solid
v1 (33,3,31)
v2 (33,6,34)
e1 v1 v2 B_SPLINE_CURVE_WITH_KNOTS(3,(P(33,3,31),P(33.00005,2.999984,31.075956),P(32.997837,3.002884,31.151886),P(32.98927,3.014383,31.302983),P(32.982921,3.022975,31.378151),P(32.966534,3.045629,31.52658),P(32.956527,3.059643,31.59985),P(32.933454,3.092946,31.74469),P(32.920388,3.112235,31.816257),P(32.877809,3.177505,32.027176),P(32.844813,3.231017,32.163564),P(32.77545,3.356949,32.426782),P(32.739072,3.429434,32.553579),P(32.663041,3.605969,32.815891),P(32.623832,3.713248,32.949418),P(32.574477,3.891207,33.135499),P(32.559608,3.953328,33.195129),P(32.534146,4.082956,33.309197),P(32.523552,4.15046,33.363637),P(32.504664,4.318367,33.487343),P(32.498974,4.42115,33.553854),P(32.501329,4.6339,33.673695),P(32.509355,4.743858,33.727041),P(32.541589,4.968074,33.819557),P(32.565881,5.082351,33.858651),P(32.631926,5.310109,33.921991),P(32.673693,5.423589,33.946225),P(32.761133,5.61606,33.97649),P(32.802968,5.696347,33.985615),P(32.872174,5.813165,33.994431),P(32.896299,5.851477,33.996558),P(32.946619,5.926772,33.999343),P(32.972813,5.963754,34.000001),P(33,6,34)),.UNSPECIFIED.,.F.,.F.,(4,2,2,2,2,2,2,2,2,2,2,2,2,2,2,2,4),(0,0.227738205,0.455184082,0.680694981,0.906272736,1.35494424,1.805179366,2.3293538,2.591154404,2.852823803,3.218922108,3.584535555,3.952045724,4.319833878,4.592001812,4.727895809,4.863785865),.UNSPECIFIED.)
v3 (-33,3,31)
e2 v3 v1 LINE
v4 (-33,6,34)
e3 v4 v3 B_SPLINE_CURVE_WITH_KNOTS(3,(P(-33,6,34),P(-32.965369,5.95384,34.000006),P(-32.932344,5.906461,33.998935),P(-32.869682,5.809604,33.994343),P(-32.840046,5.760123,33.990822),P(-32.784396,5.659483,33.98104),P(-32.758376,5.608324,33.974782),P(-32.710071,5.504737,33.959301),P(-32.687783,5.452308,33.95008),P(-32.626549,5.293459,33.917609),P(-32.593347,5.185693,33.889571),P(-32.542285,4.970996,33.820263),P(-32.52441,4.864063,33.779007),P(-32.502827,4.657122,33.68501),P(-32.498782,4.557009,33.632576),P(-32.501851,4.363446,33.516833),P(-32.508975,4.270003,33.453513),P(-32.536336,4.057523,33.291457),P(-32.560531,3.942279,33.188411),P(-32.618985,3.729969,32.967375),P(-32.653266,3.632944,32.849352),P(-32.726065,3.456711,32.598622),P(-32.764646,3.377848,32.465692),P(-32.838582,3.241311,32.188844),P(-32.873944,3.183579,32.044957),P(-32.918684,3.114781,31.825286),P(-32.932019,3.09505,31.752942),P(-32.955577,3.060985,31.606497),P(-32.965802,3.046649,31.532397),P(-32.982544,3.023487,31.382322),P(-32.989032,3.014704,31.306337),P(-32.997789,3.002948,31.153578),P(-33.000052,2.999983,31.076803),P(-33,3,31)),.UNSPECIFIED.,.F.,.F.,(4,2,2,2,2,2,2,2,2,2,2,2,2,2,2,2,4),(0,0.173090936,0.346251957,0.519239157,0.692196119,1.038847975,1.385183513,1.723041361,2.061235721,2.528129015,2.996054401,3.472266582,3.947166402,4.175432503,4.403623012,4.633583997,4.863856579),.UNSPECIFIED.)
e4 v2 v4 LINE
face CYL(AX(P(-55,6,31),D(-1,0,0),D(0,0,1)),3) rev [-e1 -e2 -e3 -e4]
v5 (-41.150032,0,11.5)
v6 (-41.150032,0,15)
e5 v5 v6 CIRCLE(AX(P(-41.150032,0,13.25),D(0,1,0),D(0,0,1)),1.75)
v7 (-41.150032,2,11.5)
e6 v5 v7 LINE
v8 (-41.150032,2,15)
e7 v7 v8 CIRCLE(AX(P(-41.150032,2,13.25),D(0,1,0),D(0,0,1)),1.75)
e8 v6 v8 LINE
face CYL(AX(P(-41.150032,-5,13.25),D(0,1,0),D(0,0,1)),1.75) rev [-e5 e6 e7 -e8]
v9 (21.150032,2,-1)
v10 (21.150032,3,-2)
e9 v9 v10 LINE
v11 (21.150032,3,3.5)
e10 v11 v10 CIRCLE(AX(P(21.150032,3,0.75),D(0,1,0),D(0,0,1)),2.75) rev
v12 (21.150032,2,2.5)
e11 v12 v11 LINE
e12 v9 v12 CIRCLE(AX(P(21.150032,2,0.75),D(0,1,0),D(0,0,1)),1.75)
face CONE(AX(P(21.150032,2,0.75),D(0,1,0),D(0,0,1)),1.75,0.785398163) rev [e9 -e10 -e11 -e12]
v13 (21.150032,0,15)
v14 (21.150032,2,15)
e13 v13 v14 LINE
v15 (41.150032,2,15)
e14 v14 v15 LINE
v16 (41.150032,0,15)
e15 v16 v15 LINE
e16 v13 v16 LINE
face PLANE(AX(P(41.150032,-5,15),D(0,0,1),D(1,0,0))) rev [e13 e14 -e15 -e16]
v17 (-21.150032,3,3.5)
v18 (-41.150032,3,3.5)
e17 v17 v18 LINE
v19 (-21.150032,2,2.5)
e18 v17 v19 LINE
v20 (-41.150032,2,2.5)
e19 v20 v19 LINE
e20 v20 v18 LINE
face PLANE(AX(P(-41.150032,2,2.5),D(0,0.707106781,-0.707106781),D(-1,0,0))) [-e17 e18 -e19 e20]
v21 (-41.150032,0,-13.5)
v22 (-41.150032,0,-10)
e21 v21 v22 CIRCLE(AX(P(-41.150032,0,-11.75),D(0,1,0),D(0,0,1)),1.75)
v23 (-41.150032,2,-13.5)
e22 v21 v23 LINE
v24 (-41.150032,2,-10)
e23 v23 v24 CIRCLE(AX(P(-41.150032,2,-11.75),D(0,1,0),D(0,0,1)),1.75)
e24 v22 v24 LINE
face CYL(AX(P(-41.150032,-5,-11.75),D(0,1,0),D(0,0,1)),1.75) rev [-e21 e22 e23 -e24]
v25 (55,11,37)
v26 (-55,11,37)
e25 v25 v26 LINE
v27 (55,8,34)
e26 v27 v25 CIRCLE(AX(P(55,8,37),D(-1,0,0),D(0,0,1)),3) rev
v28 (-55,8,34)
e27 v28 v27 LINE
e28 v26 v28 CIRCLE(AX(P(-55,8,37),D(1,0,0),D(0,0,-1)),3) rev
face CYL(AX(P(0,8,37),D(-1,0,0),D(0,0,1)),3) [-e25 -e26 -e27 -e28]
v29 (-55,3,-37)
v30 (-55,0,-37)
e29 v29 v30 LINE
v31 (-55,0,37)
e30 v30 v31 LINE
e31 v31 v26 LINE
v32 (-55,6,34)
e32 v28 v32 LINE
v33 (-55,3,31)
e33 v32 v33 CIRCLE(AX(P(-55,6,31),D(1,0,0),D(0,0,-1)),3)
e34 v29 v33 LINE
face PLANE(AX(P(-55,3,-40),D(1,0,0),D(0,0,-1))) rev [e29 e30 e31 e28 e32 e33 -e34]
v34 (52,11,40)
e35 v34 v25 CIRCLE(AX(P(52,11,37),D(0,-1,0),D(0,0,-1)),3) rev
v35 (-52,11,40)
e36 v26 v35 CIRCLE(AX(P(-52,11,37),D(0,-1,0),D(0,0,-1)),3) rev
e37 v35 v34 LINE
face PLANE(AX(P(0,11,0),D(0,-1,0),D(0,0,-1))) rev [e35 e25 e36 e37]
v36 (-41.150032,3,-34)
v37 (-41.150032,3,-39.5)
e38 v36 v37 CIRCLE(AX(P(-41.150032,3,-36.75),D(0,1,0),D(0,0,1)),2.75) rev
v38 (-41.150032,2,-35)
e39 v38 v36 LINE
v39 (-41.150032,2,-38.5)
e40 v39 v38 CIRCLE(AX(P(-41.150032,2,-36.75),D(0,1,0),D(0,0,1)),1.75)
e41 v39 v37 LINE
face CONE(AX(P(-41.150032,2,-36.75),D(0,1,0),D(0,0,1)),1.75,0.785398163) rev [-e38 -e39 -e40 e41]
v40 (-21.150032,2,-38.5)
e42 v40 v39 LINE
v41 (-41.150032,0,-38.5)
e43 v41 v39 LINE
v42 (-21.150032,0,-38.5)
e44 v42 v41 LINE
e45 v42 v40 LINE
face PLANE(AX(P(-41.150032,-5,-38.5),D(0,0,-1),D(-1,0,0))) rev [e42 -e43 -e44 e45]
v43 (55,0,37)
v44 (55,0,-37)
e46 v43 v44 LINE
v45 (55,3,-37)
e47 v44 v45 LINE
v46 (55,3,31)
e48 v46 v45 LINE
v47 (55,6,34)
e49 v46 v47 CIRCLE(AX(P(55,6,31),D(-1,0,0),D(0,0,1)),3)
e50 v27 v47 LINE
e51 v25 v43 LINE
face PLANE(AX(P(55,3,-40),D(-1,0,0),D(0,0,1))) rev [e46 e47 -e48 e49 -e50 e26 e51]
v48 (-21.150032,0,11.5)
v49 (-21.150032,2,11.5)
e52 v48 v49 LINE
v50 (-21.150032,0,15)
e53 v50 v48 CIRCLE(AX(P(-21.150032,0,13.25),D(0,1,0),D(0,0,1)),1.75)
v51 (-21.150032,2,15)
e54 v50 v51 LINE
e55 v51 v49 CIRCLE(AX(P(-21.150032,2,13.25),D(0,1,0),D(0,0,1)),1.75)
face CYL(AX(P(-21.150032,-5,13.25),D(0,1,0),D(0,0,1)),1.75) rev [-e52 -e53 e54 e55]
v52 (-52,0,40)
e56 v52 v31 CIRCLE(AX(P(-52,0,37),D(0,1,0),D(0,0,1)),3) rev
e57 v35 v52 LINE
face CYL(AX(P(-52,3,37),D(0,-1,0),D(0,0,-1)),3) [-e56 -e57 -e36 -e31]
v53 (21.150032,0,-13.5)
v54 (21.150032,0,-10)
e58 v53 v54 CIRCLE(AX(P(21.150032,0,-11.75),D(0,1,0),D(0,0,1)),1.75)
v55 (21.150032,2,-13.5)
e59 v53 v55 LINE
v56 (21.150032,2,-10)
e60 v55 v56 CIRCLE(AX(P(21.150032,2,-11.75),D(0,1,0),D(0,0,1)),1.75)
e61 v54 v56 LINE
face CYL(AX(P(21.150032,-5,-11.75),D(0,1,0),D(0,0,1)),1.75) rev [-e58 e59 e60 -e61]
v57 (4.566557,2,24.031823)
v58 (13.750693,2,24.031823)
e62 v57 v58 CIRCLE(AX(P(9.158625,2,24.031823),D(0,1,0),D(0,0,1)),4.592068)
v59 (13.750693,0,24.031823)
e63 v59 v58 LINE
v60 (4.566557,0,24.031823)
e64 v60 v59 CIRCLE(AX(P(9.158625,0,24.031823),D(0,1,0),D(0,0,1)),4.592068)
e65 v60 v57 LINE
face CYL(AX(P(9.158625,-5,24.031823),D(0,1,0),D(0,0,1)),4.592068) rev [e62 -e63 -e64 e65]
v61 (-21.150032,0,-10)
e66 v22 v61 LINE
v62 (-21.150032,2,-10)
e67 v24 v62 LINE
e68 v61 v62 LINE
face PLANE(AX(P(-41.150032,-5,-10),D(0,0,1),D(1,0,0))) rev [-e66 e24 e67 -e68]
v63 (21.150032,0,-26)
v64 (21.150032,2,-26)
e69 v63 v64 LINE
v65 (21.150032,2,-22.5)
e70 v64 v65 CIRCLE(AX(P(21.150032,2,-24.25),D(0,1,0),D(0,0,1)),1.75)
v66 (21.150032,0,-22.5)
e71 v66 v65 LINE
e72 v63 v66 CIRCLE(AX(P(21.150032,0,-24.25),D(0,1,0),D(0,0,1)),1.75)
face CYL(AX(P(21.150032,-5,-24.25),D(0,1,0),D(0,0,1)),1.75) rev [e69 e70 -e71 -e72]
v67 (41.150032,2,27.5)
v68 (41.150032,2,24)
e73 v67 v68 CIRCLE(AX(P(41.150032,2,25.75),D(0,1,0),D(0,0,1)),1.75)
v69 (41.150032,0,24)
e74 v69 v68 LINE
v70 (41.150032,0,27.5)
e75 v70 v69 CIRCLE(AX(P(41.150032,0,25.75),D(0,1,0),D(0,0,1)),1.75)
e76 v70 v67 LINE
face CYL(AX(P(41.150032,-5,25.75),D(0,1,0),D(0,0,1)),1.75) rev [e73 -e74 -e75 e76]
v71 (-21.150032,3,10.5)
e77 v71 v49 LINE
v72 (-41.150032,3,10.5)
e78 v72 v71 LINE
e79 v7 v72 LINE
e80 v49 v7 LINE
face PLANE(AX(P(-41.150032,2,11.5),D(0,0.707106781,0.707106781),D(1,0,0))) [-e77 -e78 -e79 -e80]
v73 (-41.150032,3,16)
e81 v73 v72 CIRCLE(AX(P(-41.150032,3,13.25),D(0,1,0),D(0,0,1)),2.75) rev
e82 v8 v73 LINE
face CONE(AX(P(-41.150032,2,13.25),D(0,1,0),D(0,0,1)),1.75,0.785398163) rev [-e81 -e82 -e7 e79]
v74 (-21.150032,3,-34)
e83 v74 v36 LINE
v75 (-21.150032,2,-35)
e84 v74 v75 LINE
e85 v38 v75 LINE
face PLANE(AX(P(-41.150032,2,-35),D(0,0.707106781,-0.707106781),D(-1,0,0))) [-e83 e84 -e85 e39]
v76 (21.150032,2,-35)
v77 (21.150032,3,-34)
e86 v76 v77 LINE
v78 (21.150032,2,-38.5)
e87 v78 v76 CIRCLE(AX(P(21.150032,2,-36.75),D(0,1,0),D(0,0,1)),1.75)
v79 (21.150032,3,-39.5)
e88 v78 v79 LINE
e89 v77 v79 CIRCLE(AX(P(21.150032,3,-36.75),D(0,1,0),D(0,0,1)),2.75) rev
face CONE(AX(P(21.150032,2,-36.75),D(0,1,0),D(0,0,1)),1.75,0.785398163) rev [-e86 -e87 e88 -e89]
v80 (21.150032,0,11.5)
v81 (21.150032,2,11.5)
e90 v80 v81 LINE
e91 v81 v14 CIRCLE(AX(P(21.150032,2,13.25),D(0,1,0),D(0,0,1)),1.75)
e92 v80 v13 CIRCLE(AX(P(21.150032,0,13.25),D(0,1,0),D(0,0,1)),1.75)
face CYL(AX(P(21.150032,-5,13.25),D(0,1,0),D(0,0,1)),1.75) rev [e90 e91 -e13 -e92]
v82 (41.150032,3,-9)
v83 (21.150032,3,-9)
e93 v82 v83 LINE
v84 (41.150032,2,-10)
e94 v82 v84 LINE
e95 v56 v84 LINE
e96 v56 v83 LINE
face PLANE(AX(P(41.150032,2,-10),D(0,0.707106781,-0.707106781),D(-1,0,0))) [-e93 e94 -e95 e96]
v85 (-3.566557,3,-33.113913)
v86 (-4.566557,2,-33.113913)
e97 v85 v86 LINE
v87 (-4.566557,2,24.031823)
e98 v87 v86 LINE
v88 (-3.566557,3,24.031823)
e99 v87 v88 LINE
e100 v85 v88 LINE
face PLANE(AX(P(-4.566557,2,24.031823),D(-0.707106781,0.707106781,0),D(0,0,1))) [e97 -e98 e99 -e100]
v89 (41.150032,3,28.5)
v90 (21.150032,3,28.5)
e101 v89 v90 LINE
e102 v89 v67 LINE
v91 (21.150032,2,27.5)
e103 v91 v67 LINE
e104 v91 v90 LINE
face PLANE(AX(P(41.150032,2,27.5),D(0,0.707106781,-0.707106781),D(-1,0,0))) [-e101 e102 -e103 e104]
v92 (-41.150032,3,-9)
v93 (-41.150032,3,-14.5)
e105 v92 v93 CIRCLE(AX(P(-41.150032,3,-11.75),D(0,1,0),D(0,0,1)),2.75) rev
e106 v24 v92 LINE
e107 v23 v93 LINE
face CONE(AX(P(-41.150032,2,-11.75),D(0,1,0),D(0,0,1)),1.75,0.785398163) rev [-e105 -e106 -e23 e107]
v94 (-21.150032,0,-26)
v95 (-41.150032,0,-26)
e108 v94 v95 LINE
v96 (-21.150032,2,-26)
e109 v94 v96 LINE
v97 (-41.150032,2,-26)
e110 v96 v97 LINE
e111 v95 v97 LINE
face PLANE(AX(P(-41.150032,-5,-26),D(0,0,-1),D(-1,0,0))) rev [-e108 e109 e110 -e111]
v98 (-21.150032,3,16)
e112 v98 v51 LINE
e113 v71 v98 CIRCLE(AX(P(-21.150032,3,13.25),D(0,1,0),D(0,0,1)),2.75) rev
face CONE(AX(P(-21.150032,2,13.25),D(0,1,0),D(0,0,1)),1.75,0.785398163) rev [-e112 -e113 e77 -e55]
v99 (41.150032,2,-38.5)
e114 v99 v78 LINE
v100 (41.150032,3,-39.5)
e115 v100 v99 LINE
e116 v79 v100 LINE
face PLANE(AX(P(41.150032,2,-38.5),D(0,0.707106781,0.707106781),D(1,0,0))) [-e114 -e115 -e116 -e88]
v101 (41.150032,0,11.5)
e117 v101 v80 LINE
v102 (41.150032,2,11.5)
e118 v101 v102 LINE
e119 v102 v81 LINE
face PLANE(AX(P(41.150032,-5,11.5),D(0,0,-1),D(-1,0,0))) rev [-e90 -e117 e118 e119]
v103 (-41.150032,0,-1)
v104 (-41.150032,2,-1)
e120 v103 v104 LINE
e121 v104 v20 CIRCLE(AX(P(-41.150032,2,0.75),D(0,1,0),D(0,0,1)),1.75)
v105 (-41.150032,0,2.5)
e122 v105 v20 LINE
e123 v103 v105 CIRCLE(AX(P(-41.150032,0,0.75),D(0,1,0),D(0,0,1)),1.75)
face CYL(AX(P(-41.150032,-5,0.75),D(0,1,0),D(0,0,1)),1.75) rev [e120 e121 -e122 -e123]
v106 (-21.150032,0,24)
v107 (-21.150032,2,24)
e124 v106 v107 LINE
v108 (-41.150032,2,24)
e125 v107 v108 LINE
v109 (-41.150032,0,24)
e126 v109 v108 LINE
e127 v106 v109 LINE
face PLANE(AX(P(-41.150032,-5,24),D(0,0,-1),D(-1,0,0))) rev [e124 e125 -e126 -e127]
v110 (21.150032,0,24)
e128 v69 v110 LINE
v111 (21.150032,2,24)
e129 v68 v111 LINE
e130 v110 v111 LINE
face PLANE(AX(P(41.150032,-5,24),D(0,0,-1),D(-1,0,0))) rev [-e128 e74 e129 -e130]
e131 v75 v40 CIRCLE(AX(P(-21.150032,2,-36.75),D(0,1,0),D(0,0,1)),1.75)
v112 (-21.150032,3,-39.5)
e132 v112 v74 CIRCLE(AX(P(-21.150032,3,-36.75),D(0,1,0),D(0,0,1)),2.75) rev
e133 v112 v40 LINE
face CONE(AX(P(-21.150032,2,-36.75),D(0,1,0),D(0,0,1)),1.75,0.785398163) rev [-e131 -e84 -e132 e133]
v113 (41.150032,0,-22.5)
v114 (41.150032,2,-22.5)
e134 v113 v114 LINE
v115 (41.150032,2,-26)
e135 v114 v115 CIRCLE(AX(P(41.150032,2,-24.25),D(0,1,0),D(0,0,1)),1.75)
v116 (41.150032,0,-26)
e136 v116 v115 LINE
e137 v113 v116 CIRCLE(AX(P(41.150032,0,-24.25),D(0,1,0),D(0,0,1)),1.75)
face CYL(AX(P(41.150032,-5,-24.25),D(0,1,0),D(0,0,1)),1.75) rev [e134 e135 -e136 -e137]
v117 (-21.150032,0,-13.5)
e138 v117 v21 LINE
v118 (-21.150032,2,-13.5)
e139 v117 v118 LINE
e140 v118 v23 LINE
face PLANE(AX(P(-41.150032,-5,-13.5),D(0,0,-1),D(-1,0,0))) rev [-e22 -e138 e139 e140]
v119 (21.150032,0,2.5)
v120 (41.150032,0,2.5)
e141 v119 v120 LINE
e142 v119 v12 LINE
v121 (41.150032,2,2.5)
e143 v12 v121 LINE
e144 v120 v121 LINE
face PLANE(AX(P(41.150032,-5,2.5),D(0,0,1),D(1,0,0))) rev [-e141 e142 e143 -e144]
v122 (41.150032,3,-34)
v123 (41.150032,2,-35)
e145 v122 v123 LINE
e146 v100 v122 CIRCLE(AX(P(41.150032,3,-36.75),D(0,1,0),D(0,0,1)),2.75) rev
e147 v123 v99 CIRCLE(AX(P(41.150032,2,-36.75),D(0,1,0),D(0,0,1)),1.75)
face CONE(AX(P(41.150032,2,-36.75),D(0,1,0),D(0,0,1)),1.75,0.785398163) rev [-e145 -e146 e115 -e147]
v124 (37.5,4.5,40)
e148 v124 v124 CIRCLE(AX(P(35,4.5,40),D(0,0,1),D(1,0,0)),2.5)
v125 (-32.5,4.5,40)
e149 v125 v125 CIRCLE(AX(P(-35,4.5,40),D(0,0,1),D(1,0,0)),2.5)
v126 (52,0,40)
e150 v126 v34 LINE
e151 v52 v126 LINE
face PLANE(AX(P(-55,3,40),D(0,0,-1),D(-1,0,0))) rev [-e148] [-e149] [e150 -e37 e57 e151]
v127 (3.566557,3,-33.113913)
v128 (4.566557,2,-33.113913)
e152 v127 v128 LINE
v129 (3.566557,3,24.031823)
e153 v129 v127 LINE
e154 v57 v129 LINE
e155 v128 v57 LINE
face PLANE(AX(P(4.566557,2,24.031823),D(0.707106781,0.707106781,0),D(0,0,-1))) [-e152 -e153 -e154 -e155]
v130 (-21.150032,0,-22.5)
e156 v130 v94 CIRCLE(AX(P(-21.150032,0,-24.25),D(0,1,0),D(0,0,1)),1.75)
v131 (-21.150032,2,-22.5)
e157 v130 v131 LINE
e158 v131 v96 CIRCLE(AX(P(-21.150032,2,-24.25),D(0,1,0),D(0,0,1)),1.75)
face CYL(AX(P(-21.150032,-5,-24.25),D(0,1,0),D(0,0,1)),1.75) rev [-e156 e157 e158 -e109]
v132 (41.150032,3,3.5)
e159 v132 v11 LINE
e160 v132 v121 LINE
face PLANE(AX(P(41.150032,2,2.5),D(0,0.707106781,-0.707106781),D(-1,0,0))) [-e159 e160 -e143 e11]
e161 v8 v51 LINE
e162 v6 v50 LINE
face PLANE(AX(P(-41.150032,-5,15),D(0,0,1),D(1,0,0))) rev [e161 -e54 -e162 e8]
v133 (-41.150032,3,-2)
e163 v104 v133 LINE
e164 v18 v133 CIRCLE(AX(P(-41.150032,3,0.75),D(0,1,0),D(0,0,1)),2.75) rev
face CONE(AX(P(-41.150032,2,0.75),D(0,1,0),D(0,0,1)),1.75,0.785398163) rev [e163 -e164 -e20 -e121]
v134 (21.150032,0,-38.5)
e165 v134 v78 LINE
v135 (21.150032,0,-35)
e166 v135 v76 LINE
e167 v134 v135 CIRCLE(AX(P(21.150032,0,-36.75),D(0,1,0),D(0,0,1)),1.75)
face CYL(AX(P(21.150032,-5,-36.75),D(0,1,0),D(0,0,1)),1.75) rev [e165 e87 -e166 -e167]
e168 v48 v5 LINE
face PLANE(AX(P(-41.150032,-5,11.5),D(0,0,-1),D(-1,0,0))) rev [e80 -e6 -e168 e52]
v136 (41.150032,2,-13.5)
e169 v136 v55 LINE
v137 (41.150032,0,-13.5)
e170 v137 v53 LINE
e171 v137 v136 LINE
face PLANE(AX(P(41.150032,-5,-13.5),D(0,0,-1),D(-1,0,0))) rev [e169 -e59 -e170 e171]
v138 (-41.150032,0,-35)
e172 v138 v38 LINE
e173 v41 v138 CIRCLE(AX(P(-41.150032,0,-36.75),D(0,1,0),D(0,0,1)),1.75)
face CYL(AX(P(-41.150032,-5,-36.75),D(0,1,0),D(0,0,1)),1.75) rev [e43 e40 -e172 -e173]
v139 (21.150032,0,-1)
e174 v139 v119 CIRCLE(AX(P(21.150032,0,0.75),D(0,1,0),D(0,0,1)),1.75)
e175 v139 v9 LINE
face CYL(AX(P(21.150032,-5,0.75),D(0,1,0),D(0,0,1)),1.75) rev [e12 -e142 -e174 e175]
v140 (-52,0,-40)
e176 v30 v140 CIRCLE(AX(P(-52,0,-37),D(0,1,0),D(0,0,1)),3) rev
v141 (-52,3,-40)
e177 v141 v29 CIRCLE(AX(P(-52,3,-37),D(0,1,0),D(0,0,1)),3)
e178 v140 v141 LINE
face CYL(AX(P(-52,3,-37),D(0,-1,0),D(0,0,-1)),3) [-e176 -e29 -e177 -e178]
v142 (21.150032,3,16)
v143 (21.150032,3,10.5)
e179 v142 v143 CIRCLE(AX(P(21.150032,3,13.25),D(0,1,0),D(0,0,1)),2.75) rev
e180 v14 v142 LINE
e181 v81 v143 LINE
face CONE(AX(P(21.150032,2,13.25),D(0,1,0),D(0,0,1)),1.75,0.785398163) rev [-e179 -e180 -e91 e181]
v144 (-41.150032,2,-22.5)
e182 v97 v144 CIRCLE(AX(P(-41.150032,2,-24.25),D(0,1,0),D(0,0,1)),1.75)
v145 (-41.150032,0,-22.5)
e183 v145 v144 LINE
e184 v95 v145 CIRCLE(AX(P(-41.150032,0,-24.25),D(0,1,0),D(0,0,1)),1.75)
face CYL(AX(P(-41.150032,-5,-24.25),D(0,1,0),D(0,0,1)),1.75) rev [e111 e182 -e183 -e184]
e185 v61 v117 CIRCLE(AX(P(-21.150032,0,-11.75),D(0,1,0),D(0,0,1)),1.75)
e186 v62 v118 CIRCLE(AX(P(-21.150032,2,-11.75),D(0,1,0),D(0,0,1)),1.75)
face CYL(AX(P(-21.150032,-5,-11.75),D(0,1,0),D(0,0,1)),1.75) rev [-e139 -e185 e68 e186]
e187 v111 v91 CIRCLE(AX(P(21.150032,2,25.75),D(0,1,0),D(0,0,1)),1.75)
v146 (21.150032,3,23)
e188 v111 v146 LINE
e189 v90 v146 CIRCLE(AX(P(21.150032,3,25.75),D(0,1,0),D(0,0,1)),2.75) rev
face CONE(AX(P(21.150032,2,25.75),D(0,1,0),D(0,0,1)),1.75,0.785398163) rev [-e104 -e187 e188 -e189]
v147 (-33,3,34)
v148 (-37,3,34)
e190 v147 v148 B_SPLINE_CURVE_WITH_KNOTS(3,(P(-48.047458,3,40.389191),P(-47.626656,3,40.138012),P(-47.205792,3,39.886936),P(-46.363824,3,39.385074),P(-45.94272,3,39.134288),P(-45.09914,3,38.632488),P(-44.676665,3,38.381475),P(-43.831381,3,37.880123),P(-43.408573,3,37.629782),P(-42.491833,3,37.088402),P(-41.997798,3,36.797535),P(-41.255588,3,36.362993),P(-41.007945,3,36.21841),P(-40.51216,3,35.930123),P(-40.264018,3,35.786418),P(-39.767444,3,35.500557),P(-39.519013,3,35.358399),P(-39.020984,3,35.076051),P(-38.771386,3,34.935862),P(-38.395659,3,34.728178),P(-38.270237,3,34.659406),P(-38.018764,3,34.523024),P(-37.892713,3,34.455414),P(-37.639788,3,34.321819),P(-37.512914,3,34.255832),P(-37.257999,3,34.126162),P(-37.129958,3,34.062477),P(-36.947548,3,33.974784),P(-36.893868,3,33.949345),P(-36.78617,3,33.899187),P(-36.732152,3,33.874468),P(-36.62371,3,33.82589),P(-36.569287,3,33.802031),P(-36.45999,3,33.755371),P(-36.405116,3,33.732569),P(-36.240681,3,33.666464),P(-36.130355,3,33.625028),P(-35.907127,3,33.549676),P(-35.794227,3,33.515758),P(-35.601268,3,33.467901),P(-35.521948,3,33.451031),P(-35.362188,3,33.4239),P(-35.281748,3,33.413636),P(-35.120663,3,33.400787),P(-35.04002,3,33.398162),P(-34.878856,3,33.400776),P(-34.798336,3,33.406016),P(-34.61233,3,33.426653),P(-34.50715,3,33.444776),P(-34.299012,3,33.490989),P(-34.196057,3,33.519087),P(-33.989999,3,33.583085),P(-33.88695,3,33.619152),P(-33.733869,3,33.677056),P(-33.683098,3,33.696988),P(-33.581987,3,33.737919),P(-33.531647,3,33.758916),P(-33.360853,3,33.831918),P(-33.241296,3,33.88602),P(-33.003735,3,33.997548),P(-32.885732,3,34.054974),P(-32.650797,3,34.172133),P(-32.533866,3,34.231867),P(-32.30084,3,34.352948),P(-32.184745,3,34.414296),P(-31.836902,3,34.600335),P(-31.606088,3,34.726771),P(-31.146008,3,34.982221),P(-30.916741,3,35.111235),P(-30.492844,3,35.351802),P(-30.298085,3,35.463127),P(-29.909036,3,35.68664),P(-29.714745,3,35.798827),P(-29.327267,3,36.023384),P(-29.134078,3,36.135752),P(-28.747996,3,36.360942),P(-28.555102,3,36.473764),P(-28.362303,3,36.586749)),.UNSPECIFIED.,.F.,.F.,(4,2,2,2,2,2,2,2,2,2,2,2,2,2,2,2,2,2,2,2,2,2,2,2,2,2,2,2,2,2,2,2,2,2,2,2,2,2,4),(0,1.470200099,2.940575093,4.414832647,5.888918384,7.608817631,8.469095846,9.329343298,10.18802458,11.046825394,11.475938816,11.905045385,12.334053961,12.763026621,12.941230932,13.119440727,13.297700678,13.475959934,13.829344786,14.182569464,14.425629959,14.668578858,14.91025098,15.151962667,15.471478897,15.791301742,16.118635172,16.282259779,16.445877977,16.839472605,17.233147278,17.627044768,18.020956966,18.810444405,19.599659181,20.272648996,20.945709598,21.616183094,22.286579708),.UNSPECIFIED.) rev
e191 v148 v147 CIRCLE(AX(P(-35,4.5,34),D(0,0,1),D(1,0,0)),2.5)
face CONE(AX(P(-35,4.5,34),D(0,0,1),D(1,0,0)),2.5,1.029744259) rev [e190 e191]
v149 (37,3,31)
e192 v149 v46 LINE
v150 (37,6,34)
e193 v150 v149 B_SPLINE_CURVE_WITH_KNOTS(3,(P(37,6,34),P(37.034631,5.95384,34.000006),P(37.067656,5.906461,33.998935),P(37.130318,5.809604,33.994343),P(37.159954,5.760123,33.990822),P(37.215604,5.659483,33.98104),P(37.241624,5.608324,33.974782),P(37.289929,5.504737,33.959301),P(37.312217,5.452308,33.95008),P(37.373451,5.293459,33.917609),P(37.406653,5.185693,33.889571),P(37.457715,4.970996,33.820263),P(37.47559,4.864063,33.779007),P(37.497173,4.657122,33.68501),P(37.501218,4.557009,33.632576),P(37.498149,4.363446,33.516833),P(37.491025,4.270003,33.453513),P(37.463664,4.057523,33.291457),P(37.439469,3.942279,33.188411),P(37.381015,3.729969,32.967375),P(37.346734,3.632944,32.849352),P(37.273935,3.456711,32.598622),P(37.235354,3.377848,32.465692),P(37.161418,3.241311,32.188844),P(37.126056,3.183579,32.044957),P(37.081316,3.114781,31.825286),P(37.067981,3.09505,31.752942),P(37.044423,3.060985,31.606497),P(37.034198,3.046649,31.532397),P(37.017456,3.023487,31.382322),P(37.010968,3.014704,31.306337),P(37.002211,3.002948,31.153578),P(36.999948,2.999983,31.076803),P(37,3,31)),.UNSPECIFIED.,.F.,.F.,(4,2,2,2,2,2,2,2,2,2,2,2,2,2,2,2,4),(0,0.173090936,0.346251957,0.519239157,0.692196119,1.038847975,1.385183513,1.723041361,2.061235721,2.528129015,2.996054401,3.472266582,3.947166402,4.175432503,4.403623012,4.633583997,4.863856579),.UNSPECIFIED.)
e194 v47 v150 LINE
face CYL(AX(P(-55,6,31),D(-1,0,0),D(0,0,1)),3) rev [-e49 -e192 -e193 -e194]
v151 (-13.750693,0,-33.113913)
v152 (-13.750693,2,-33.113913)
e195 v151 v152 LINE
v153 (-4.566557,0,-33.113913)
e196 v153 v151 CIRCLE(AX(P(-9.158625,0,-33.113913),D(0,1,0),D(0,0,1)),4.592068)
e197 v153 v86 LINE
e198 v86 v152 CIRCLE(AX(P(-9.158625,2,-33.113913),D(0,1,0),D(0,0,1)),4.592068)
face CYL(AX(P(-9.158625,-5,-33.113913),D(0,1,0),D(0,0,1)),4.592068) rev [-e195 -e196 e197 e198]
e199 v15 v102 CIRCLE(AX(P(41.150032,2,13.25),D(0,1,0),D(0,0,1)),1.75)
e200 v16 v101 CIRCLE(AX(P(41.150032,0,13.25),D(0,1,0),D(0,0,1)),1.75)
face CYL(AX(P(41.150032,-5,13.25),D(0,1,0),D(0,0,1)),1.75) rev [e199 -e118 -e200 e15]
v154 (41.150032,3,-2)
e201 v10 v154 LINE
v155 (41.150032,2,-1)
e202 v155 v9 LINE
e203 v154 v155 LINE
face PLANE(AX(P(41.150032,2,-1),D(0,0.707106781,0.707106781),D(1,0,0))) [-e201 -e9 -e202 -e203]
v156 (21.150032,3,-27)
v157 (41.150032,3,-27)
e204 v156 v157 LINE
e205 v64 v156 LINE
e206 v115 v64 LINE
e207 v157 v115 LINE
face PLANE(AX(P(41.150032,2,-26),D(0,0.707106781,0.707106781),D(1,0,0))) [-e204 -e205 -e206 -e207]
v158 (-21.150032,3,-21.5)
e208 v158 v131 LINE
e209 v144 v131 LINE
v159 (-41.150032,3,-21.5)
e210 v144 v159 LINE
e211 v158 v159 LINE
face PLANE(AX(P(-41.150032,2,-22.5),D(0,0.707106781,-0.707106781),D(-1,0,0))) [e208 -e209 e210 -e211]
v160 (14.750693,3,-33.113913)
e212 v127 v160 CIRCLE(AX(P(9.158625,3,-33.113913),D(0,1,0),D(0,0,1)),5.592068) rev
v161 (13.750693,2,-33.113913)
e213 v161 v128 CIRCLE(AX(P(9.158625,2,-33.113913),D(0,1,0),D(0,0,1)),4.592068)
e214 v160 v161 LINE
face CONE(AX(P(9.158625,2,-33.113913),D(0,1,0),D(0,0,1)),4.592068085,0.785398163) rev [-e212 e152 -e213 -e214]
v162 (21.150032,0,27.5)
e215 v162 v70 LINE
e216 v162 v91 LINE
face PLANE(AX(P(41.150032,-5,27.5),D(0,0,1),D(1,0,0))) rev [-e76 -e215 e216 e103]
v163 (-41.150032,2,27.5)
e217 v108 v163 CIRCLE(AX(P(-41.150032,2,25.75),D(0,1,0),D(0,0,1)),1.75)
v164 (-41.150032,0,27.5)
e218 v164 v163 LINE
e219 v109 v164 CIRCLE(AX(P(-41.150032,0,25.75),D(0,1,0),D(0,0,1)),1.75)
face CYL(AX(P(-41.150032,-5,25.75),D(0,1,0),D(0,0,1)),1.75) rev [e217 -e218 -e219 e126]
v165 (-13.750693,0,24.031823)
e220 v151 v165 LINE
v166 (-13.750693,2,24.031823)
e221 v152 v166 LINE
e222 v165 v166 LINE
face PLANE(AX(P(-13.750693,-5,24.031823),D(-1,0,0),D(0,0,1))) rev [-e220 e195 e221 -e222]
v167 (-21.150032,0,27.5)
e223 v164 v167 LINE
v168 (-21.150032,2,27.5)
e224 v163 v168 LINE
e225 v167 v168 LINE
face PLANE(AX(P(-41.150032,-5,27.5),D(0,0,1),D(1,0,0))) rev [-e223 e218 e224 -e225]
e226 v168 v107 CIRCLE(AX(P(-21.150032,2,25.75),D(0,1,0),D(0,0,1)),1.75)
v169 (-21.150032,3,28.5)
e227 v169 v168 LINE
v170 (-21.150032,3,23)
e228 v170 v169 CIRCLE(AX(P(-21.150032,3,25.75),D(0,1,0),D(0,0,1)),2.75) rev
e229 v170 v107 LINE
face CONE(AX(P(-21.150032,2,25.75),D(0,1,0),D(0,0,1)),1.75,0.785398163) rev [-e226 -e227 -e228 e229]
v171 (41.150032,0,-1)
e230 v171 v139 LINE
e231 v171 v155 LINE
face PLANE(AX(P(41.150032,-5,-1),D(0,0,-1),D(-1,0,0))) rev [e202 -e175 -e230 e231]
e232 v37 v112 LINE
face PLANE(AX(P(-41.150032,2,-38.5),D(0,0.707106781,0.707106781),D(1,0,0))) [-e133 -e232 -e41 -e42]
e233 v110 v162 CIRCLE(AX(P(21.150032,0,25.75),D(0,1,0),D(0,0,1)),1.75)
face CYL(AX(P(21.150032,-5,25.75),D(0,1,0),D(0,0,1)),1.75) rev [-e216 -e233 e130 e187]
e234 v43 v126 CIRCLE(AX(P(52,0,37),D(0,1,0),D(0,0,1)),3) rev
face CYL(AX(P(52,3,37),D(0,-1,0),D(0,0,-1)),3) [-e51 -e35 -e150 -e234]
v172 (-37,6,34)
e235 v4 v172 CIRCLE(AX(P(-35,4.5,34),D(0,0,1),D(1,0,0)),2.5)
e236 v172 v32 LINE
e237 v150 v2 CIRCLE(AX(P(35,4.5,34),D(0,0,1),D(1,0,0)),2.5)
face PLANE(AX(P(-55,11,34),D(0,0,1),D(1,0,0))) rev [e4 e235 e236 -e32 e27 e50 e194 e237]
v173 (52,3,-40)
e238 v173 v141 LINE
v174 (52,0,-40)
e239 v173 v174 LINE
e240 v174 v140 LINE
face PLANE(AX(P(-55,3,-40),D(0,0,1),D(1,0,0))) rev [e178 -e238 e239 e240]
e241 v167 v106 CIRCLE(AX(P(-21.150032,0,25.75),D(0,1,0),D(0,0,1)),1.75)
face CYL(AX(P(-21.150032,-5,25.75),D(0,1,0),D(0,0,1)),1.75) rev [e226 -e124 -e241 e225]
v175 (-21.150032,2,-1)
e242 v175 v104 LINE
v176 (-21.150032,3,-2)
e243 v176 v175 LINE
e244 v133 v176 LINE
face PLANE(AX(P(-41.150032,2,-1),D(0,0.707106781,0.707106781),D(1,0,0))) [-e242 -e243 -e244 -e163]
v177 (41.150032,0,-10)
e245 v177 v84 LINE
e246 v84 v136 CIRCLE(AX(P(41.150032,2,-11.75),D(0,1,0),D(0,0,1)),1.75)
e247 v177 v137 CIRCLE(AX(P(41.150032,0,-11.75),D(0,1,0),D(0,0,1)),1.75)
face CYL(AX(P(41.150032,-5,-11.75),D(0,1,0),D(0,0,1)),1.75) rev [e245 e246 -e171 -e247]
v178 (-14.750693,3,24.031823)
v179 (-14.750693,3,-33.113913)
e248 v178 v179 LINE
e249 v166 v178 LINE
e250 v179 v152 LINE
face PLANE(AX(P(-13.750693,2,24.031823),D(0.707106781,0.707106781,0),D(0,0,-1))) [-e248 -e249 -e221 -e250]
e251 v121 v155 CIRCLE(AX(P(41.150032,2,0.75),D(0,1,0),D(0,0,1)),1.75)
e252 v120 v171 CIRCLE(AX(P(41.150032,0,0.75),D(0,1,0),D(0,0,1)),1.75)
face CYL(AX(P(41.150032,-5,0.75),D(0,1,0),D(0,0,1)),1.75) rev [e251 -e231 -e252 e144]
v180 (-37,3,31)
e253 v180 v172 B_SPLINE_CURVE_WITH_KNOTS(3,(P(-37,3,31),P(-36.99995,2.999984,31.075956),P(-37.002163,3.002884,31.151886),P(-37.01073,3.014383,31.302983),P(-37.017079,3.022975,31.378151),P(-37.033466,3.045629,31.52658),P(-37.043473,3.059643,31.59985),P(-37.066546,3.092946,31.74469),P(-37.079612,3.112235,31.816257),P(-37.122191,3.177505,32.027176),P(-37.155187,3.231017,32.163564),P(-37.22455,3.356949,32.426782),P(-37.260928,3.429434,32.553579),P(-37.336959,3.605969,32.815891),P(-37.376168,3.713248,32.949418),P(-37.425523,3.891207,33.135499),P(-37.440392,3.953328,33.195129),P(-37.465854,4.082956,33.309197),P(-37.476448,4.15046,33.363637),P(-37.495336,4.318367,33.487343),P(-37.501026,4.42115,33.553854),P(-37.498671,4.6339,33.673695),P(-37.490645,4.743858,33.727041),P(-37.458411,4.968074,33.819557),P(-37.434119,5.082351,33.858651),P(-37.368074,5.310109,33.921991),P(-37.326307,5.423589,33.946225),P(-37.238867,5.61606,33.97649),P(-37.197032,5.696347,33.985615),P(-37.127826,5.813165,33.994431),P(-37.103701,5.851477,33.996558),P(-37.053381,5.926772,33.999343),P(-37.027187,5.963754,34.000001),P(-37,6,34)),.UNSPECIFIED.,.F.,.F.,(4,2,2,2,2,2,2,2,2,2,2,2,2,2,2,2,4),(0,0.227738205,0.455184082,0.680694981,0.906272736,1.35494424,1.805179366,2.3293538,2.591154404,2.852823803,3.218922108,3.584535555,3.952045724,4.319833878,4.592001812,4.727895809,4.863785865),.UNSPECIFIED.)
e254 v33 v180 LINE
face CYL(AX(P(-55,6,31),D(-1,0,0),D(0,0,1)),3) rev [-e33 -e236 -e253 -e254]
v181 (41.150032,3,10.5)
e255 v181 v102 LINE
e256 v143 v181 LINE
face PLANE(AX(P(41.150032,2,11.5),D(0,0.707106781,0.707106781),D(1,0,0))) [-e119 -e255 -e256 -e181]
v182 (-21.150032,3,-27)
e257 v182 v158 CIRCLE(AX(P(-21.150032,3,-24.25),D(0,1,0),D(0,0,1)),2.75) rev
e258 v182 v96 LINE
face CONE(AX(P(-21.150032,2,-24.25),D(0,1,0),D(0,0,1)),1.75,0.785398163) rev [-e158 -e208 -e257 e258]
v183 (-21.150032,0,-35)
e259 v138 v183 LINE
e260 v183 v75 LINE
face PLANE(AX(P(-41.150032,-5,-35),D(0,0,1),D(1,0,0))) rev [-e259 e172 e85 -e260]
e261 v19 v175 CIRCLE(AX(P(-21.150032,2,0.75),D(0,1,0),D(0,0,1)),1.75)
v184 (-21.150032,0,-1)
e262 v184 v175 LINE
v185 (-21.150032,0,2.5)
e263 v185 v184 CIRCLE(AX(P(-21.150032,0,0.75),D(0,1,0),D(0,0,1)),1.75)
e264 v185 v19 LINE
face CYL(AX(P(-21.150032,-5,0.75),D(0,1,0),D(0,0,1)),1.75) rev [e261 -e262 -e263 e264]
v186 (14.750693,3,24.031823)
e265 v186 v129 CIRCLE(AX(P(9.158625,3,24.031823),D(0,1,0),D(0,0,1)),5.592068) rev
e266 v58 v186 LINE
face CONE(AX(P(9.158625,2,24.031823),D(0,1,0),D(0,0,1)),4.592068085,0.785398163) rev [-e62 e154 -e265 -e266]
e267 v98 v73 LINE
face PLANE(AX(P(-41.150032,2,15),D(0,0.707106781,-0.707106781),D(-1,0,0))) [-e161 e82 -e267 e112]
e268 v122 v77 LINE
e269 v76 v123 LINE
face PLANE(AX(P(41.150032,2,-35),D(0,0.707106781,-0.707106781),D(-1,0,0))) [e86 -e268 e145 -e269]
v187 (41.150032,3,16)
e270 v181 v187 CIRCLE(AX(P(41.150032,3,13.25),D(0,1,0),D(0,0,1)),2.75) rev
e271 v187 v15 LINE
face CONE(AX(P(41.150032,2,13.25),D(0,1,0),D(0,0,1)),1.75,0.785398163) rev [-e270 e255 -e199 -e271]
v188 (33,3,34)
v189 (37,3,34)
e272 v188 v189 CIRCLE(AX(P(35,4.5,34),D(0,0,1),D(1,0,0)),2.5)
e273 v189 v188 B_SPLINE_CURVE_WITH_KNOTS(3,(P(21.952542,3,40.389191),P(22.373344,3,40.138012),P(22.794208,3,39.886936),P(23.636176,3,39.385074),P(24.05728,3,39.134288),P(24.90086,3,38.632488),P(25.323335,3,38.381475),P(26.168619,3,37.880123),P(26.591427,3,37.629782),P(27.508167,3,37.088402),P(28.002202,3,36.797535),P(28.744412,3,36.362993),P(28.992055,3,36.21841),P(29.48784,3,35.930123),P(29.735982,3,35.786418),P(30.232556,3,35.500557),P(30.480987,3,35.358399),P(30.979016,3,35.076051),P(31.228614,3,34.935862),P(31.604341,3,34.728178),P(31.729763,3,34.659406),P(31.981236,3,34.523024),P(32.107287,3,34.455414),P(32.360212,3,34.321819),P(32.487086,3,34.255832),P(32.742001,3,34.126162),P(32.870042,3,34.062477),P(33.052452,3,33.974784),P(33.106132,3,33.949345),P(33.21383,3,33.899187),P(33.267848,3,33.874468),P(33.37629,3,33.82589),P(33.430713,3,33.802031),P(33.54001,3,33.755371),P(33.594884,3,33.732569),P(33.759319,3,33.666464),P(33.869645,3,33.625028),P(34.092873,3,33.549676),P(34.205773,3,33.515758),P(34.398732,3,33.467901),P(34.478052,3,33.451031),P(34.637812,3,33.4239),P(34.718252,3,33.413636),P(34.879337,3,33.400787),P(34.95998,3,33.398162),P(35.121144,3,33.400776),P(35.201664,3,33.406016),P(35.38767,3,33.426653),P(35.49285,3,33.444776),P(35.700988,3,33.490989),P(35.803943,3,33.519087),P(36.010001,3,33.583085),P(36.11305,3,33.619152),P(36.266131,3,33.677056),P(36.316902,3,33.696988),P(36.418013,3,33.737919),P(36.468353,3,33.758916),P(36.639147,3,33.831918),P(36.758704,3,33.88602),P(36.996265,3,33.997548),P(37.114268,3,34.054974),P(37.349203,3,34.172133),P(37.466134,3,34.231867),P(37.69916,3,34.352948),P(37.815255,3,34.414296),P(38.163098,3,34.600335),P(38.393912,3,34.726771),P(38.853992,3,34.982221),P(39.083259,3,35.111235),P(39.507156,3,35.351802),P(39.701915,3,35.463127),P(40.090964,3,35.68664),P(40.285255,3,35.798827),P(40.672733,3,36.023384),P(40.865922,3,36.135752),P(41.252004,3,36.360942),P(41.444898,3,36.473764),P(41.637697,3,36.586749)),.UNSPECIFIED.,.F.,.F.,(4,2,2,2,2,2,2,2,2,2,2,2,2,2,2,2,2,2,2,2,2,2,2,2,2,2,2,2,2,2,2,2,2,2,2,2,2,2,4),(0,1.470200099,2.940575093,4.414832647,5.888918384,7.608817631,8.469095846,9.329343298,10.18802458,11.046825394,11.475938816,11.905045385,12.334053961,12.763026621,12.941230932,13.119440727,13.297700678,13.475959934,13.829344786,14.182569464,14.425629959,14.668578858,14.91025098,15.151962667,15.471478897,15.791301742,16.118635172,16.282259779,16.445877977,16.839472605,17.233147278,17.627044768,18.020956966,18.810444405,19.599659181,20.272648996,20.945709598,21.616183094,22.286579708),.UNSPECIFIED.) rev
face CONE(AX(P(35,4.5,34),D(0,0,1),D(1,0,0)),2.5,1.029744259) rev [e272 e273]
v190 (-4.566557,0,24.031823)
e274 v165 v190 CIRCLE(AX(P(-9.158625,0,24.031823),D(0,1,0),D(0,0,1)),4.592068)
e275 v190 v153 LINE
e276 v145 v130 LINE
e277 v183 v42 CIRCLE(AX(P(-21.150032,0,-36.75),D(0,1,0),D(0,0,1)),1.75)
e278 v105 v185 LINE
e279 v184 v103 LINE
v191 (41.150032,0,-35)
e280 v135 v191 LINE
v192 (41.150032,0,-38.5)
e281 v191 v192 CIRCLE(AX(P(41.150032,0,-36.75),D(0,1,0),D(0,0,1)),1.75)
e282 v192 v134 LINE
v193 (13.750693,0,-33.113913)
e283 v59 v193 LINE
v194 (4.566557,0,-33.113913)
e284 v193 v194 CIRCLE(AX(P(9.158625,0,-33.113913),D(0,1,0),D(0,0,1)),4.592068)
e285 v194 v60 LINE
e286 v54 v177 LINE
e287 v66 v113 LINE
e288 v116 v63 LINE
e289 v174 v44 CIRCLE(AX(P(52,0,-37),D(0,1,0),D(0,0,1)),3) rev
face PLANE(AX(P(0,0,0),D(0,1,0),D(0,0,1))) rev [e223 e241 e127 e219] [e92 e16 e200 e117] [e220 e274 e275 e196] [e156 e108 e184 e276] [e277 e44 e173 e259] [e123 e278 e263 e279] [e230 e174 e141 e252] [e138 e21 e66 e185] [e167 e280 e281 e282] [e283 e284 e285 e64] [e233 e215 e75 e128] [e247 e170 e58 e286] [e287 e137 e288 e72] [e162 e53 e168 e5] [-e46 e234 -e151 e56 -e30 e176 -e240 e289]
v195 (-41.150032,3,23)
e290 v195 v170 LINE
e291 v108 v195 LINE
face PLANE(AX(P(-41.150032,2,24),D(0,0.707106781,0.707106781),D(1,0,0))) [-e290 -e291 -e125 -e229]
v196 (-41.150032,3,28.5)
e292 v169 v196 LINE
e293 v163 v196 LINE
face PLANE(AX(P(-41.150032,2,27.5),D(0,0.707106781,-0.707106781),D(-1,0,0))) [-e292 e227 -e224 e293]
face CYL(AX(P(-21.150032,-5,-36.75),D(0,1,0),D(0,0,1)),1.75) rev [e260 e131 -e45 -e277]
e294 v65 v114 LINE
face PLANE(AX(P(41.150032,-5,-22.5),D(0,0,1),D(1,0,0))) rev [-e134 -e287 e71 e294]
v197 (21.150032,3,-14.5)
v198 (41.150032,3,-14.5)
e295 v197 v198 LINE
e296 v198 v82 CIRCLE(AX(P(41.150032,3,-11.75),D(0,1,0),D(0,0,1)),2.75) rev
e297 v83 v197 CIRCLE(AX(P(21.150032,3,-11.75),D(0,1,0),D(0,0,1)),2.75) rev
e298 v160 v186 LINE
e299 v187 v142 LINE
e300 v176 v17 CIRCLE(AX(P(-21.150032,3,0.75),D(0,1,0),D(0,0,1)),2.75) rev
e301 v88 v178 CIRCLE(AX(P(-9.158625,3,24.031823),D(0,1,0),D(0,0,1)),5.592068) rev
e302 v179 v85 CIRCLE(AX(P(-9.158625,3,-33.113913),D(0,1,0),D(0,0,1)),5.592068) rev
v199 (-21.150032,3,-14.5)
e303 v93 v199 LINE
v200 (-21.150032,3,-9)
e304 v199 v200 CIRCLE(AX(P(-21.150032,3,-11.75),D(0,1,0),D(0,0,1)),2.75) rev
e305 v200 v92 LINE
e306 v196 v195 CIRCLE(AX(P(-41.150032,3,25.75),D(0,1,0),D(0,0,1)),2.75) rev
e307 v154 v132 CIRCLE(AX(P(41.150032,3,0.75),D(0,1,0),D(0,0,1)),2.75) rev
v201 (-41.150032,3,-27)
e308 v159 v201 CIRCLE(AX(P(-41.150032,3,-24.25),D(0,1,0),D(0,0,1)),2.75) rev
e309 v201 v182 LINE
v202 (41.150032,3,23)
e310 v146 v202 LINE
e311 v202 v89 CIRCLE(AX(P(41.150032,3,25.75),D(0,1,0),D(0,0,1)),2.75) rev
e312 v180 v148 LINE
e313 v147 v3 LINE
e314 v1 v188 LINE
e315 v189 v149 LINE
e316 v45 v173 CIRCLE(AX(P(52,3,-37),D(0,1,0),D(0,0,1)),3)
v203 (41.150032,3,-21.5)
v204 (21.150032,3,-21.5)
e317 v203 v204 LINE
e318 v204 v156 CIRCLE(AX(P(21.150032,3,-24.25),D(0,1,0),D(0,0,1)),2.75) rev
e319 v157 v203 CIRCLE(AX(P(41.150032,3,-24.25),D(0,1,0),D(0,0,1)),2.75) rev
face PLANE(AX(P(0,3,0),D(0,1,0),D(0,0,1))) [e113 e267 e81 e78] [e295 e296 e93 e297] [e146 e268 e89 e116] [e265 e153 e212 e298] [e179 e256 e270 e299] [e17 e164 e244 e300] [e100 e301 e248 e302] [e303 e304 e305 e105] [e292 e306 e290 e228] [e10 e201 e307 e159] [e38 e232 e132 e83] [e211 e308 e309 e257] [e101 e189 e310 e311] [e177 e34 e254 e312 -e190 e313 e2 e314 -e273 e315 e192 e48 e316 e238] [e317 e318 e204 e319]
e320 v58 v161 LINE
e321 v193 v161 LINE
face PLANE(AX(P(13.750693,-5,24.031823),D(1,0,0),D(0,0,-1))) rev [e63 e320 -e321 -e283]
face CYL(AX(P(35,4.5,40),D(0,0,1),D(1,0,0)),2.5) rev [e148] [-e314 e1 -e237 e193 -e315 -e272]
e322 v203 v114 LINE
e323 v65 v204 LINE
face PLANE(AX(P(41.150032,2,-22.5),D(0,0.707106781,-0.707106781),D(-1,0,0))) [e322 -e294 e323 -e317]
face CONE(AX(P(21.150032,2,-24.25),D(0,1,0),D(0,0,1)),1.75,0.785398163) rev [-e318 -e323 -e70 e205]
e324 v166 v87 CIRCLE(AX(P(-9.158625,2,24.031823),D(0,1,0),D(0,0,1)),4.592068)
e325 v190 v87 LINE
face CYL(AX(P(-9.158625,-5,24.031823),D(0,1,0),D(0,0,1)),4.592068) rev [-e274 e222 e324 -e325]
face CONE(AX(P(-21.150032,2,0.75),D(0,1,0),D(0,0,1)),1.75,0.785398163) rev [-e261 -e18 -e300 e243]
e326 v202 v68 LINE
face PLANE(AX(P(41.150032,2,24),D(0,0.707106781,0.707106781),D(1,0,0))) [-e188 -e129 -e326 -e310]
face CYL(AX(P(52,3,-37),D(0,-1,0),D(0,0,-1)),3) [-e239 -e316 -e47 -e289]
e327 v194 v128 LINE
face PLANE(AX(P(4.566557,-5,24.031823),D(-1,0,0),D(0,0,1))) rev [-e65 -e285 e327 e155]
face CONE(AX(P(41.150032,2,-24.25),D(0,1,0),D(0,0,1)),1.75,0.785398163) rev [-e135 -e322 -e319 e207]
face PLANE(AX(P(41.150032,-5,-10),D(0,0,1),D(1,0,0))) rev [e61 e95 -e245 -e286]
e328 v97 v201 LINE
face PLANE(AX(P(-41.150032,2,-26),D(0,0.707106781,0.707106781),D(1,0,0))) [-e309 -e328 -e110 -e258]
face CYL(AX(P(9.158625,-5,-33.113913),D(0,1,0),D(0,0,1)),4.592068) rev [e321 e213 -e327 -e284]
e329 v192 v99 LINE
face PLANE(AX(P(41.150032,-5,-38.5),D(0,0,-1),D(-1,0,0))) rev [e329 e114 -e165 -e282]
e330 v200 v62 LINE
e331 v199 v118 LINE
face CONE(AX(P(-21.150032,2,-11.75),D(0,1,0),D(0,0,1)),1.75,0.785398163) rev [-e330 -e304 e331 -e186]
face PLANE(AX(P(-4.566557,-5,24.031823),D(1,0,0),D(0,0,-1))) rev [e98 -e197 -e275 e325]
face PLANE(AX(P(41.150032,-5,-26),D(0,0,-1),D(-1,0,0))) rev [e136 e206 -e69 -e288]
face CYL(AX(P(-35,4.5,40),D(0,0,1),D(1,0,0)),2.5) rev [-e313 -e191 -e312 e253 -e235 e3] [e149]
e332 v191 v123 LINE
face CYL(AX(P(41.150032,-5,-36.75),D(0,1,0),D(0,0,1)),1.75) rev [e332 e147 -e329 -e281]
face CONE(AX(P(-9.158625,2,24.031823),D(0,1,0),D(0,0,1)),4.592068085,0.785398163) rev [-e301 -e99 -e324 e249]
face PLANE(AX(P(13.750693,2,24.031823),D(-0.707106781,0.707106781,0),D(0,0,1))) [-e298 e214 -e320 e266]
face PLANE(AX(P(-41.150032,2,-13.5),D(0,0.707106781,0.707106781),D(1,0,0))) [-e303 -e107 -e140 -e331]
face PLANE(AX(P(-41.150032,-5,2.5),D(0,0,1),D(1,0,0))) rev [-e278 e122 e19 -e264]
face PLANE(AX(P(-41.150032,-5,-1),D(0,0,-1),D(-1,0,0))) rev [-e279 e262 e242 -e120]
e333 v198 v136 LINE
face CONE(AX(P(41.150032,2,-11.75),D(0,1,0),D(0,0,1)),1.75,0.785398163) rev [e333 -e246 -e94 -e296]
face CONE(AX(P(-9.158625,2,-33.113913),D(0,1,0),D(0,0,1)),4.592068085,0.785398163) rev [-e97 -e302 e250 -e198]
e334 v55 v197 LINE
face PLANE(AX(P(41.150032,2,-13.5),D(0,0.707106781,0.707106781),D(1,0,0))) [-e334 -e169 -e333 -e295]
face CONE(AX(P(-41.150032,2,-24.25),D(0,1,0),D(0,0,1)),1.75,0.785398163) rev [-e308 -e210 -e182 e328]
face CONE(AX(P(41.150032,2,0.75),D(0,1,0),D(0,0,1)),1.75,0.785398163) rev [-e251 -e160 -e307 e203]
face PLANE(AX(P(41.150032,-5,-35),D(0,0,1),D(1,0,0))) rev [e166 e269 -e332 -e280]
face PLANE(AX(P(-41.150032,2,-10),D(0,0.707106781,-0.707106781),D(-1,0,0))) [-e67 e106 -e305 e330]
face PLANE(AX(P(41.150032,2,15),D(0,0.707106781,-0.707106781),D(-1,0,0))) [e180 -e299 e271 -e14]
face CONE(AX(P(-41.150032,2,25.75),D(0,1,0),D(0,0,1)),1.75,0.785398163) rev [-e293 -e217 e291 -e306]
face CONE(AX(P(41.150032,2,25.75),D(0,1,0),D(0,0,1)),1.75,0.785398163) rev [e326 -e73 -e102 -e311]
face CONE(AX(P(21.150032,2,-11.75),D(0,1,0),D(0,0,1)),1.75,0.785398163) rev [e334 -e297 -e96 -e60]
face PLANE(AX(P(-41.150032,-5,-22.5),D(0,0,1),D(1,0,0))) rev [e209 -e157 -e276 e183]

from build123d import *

# Parameters (mm, degrees)
SKETCH1_W                        = 110
SKETCH1_H                        = 80
BOSS_EXTRUDE1_DEPTH              = 3
SKETCH2_W                        = 110
SKETCH2_H                        = 6
BOSS_EXTRUDE2_DEPTH              = 8
F_1_8_27_NPSM_TAPPED_HOLE1_D     = 5
F_1_8_27_NPSM_TAPPED_HOLE1_DEPTH = 6
F_1_8_27_NPSM_TAPPED_HOLE1_TIP   = 1.502151548
FILLET1_R                        = 3
CUT_EXTRUDE1_DEPTH               = 8
LPATTERN1_COUNT                  = 6
LPATTERN1_PITCH                  = 12.5
CUT_EXTRUDE2_DEPTH               = 8
FILLET2_R                        = 3
CHAMFER1_SIZE                    = 1


with BuildPart() as part:
    # Sketch1 → Boss-Extrude1 (new body)
    with BuildSketch(Plane(origin=(0, 0, 0), x_dir=(1, 0, 0), z_dir=(0, 1, 0))):
        Rectangle(SKETCH1_W, SKETCH1_H)
    extrude(amount=BOSS_EXTRUDE1_DEPTH)

    # Sketch2 → Boss-Extrude2 (add)
    with BuildSketch(Plane(origin=(0, 3, 0), x_dir=(1, 0, 0), z_dir=(0, 1, 0))):
        with Locations((0, -37)):
            Rectangle(SKETCH2_W, SKETCH2_H)
    extrude(amount=BOSS_EXTRUDE2_DEPTH)

    # 1/8-27 NPSM Tapped Hole1
    with Locations(Plane.XY.offset(40)):
        with Locations((-35, 4.5), (35, 4.5)):
            Hole(F_1_8_27_NPSM_TAPPED_HOLE1_D / 2, depth=F_1_8_27_NPSM_TAPPED_HOLE1_DEPTH)
            with Locations((0, 0, -(F_1_8_27_NPSM_TAPPED_HOLE1_DEPTH + F_1_8_27_NPSM_TAPPED_HOLE1_TIP / 2))):  # 118° drill point
                Cone(0, F_1_8_27_NPSM_TAPPED_HOLE1_D / 2, F_1_8_27_NPSM_TAPPED_HOLE1_TIP, mode=Mode.SUBTRACT)

    # Fillet1
    # the kernel refuses this fillet: 3 mm, written as the material it adds along each edge
    with BuildSketch(Plane(origin=(55, 3, 34), x_dir=(0, 0, -1), z_dir=(-1, 0, 0))) as fillet1_piece_1_section:
        with BuildLine():
            CenterArc((FILLET1_R, -FILLET1_R), FILLET1_R, 90, 90)
            Line((0, -FILLET1_R), (0, 0))
            Line((0, 0), (FILLET1_R, 0))
        make_face()
    fillet1_piece_1 = extrude(amount=25.5, mode=Mode.PRIVATE)
    fillet1_piece_1 = fillet1_piece_1 - Plane(origin=(35, 4.5, 33.326842019), x_dir=(-1, 0, 0), z_dir=(0, 0, -1)) * Cylinder(2.5, 64, mode=Mode.PRIVATE)
    add(fillet1_piece_1)
    with BuildSketch(Plane(origin=(40.5, 3, 34), x_dir=(0, 0, -1), z_dir=(-1, 0, 0))) as fillet1_piece_2_section:
        with BuildLine():
            CenterArc((FILLET1_R, -FILLET1_R), FILLET1_R, 90, 90)
            Line((0, -FILLET1_R), (0, 0))
            Line((0, 0), (FILLET1_R, 0))
        make_face()
    fillet1_piece_2 = extrude(amount=81, mode=Mode.PRIVATE)
    fillet1_piece_2 = fillet1_piece_2 - Plane(origin=(35, 4.5, 33.313079734), x_dir=(-1, 0, 0), z_dir=(0, 0, -1)) * Cylinder(2.5, 175, mode=Mode.PRIVATE)
    fillet1_piece_2 = fillet1_piece_2 - Plane(origin=(-35, 4.5, 33.313079734), x_dir=(-1, 0, 0), z_dir=(0, 0, -1)) * Cylinder(2.5, 175, mode=Mode.PRIVATE)
    add(fillet1_piece_2)
    with BuildSketch(Plane(origin=(-29.5, 3, 34), x_dir=(0, 0, -1), z_dir=(-1, 0, 0))) as fillet1_piece_3_section:
        with BuildLine():
            CenterArc((FILLET1_R, -FILLET1_R), FILLET1_R, 90, 90)
            Line((0, -FILLET1_R), (0, 0))
            Line((0, 0), (FILLET1_R, 0))
        make_face()
    fillet1_piece_3 = extrude(amount=25.5, mode=Mode.PRIVATE)
    fillet1_piece_3 = fillet1_piece_3 - Plane(origin=(-35, 4.5, 33.313079734), x_dir=(-1, 0, 0), z_dir=(0, 0, -1)) * Cylinder(2.5, 63, mode=Mode.PRIVATE)
    add(fillet1_piece_3)
    # the kernel refuses this fillet: 3 mm, written as the material it takes off along each edge
    with BuildSketch(Plane(origin=(62.5, 11, 34), x_dir=(0, -1, 0), z_dir=(-1, 0, 0))) as fillet1_2_piece_1:
        with BuildLine():
            CenterArc((FILLET1_R, FILLET1_R), FILLET1_R, 180, 90)
            Line((0, FILLET1_R), (0, 0))
            Line((0, 0), (FILLET1_R, 0))
        make_face()
    extrude(amount=125, mode=Mode.SUBTRACT)

    # Sketch6 → Cut-Extrude1 (cut)
    with BuildSketch(Plane(origin=(0, 3, 0), x_dir=(1, 0, 0), z_dir=(0, 1, 0))):
        with BuildLine():
            Line((-41.150032335, -24), (-21.150032335, -24))
            ThreePointArc((-21.150032335, -24), (-19.400032335, -25.75), (-21.150032335, -27.5))
            Line((-21.150032335, -27.5), (-41.150032335, -27.5))
            ThreePointArc((-41.150032335, -27.5), (-42.900032335, -25.75), (-41.150032335, -24))
        make_face()
        with BuildLine():
            Line((41.150032335, -24), (21.150032335, -24))
            ThreePointArc((21.150032335, -24), (19.400032335, -25.75), (21.150032335, -27.5))
            Line((21.150032335, -27.5), (41.150032335, -27.5))
            ThreePointArc((41.150032335, -27.5), (42.900032335, -25.75), (41.150032335, -24))
        make_face()
    cut_extrude1 = extrude(amount=-CUT_EXTRUDE1_DEPTH, mode=Mode.SUBTRACT)

    # LPattern1: Cut-Extrude1 ×6
    with Locations(*[(0, 0, -i * LPATTERN1_PITCH) for i in range(1, LPATTERN1_COUNT)]):
        add(cut_extrude1, mode=Mode.SUBTRACT)

    # Sketch7 → Cut-Extrude2 (cut)
    with BuildSketch(Plane(origin=(0, 3, 0), x_dir=(1, 0, 0), z_dir=(0, 1, 0))):
        with BuildLine():
            Line((-13.750692764, -24.031822976), (-13.750692764, 33.113913187))
            ThreePointArc((-13.750692764, 33.113913187), (-9.15862468, 37.705981272), (-4.566556595, 33.113913187))
            Line((-4.566556595, 33.113913187), (-4.566556595, -24.031822976))
            ThreePointArc((-4.566556595, -24.031822976), (-9.15862468, -28.62389106), (-13.750692764, -24.031822976))
        make_face()
        with BuildLine():
            Line((13.750692764, -24.031822976), (13.750692764, 33.113913187))
            ThreePointArc((13.750692764, 33.113913187), (9.15862468, 37.705981272), (4.566556595, 33.113913187))
            Line((4.566556595, 33.113913187), (4.566556595, -24.031822976))
            ThreePointArc((4.566556595, -24.031822976), (9.15862468, -28.62389106), (13.750692764, -24.031822976))
        make_face()
    extrude(amount=-CUT_EXTRUDE2_DEPTH, mode=Mode.SUBTRACT)

    # Fillet2
    fillet2_edges = [part.edges().sort_by_distance(p)[0] for p in [
        (-55, 5.5, 40),
        (55, 5.5, 40),
        (55, 1.5, -40),
        (-55, 1.5, -40),
    ]]
    fillet(fillet2_edges, radius=FILLET2_R)

    # Chamfer1
    chamfer1_edges = [part.edges().sort_by_distance(p)[0] for p in [
        (-42.900032335, 3, 25.75),
        (-31.150032335, 3, 27.5),
        (-19.400032335, 3, 25.75),
        (-31.150032335, 3, 24),
        (42.900032335, 3, 25.75),
        (31.150032335, 3, 24),
        (19.400032335, 3, 25.75),
        (31.150032335, 3, 27.5),
        (-42.900032335, 3, 13.25),
        (-31.150032335, 3, 15),
        (-19.400032335, 3, 13.25),
        (-31.150032335, 3, 11.5),
        (-42.900032335, 3, 0.75),
        (-31.150032335, 3, -1),
        (-19.400032335, 3, 0.75),
        (-31.150032335, 3, 2.5),
        (-42.900032335, 3, -11.75),
        (-31.150032335, 3, -13.5),
        (-19.400032335, 3, -11.75),
        (-31.150032335, 3, -10),
        (-42.900032335, 3, -24.25),
        (-31.150032335, 3, -26),
        (-19.400032335, 3, -24.25),
        (-31.150032335, 3, -22.5),
        (-42.900032335, 3, -36.75),
        (-31.150032335, 3, -38.5),
        (-19.400032335, 3, -36.75),
        (-31.150032335, 3, -35),
        (42.900032335, 3, 13.25),
        (31.150032335, 3, 11.5),
        (19.400032335, 3, 13.25),
        (31.150032335, 3, 15),
        (42.900032335, 3, 0.75),
        (31.150032335, 3, 2.5),
        (19.400032335, 3, 0.75),
        (31.150032335, 3, -1),
        (42.900032335, 3, -11.75),
        (31.150032335, 3, -10),
        (19.400032335, 3, -11.75),
        (31.150032335, 3, -13.5),
        (42.900032335, 3, -24.25),
        (31.150032335, 3, -22.5),
        (19.400032335, 3, -24.25),
        (31.150032335, 3, -26),
        (42.900032335, 3, -36.75),
        (31.150032335, 3, -35),
        (19.400032335, 3, -36.75),
        (31.150032335, 3, -38.5),
        (-9.15862468, 3, 28.62389106),
        (-4.566556595, 3, -4.541045106),
        (-9.15862468, 3, -37.705981272),
        (-13.750692764, 3, -4.541045106),
        (9.15862468, 3, 28.62389106),
        (13.750692764, 3, -4.541045106),
        (9.15862468, 3, -37.705981272),
        (4.566556595, 3, -4.541045106),
    ]]
    chamfer(chamfer1_edges, length=CHAMFER1_SIZE)


solid = part.part
